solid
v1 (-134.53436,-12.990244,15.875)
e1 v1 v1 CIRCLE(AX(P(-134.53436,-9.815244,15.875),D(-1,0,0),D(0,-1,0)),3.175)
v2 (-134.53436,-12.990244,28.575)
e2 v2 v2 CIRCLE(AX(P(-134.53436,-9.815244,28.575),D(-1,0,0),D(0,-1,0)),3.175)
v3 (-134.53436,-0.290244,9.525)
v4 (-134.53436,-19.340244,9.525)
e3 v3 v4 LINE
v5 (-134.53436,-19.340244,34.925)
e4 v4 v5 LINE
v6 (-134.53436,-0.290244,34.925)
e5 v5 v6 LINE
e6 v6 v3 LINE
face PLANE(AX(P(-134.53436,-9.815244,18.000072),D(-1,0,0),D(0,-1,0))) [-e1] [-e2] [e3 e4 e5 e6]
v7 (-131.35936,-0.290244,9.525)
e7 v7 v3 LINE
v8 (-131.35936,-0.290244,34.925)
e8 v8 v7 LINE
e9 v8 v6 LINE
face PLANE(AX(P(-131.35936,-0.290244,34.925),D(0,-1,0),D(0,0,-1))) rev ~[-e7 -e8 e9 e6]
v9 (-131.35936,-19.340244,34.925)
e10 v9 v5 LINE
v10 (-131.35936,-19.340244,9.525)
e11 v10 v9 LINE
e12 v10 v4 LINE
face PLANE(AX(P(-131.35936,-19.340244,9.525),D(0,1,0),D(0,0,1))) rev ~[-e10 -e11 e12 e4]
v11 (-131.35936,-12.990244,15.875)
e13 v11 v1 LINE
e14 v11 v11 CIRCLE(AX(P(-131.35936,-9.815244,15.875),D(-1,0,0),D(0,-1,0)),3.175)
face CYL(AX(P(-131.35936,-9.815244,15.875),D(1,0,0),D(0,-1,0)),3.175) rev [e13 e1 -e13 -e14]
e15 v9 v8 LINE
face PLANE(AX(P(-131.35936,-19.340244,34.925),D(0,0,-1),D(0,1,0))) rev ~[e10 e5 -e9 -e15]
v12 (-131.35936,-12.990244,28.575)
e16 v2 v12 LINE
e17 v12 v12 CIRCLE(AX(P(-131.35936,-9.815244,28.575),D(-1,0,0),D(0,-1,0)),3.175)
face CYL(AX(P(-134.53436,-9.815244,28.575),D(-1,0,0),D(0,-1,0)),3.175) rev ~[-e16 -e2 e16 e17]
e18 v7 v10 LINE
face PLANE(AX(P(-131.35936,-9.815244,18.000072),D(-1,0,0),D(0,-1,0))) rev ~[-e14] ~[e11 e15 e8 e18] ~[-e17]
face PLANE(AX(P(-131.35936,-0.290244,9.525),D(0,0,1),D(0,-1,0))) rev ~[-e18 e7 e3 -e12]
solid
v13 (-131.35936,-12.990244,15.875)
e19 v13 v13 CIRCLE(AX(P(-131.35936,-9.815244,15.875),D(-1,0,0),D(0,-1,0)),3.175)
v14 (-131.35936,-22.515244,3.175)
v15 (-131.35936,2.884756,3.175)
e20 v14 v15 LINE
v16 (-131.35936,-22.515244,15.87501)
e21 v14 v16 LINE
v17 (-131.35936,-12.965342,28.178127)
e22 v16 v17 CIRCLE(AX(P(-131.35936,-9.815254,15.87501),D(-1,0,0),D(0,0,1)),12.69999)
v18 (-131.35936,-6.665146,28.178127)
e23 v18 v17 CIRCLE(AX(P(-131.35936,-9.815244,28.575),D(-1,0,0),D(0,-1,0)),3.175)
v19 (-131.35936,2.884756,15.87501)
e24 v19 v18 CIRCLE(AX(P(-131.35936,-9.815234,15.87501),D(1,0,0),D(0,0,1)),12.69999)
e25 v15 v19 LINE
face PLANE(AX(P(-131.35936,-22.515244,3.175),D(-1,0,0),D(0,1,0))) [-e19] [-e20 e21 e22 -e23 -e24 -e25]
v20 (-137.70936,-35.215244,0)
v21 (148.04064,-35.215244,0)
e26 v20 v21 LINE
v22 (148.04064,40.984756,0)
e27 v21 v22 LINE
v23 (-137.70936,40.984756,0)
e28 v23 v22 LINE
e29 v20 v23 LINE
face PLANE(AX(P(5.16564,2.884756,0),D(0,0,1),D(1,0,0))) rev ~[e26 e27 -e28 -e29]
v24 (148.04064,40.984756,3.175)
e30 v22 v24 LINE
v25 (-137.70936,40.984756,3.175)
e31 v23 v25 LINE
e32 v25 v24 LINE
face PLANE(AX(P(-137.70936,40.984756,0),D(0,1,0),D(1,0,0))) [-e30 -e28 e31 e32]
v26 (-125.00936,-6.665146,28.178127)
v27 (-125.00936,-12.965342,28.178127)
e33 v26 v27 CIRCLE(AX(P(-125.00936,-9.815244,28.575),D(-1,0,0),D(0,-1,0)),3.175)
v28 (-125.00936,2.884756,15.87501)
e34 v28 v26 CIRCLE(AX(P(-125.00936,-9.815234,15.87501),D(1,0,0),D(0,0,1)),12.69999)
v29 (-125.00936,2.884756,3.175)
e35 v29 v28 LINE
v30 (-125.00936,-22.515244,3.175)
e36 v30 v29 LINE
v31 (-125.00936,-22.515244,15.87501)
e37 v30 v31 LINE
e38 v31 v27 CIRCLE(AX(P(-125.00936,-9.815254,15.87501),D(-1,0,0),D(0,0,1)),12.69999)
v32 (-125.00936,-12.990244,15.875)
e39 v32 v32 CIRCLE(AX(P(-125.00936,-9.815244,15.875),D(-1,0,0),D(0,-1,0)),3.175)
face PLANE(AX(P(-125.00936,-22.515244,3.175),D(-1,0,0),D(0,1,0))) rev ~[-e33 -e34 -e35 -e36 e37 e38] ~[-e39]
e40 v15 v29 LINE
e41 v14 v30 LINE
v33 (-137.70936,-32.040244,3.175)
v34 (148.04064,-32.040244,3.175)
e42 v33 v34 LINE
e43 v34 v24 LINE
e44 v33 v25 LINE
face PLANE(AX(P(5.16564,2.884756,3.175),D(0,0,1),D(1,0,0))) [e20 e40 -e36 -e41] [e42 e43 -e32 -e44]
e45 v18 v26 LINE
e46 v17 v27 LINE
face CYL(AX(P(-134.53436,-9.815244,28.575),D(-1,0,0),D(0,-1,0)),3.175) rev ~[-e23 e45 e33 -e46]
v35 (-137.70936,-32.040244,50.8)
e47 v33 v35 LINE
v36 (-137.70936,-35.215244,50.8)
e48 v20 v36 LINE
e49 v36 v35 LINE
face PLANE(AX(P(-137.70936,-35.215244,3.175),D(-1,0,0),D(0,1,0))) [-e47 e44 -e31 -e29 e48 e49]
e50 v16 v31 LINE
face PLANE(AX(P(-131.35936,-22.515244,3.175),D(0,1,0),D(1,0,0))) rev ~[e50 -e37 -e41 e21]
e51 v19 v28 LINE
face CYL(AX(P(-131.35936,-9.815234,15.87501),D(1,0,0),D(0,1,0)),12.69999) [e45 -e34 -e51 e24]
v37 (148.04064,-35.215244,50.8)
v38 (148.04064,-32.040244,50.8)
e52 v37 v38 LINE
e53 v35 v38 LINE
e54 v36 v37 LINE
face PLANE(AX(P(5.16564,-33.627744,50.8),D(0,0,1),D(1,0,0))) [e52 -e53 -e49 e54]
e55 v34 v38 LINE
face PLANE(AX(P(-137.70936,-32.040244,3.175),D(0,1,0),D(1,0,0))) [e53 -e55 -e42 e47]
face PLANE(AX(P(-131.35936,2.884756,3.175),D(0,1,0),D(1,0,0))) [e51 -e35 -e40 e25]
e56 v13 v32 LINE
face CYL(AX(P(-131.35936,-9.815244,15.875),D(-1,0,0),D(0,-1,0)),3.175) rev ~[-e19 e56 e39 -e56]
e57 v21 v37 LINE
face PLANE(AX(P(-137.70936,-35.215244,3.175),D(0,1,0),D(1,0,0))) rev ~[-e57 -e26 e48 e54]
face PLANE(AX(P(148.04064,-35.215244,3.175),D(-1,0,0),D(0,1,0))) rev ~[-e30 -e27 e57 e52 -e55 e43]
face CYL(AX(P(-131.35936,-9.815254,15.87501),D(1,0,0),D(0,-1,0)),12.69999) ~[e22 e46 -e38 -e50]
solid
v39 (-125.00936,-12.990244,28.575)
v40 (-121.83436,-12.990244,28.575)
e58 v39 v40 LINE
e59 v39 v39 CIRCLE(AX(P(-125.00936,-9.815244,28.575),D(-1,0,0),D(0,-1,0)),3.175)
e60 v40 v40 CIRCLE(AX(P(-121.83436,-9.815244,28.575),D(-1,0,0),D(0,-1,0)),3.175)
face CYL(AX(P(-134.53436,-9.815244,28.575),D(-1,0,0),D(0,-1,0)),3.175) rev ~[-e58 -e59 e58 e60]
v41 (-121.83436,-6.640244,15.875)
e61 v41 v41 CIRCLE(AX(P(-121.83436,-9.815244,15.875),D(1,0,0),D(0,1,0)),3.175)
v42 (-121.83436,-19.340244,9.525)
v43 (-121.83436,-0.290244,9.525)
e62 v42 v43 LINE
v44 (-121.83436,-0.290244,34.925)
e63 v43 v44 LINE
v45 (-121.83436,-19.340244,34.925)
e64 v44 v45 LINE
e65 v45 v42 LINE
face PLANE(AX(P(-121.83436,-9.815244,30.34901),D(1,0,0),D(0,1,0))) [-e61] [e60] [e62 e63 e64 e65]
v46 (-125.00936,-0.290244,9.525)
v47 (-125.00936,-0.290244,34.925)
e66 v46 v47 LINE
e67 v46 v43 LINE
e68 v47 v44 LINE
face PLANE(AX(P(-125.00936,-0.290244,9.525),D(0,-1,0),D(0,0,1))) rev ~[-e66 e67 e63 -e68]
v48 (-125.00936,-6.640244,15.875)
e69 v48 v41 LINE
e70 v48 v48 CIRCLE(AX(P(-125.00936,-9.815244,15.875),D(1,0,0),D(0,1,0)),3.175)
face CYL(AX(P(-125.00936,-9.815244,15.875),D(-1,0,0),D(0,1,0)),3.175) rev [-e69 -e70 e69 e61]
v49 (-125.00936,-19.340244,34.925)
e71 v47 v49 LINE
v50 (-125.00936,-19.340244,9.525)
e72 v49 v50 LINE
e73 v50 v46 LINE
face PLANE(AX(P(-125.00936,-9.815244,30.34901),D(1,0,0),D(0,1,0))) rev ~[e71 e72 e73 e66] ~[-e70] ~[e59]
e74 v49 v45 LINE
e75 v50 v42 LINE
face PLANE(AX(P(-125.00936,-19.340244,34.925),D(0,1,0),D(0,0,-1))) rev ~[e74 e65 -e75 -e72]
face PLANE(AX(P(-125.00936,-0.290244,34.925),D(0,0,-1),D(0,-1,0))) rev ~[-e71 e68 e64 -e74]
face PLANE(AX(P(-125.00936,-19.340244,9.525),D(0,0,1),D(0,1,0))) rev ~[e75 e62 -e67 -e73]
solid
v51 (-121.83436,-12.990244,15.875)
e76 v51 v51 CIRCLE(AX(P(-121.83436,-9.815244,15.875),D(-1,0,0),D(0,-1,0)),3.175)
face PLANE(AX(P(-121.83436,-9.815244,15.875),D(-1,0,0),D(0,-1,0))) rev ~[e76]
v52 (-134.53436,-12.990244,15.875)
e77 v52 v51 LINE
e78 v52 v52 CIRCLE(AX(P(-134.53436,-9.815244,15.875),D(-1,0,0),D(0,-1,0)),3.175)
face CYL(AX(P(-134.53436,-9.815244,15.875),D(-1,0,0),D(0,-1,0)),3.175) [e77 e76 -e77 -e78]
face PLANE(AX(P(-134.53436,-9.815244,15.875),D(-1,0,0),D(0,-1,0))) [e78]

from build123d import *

# Parameters (mm, degrees)
F0_W      = 285.75
F0_H      = 76.2
F1_DEPTH  = 3.175
F2_W      = 285.75
F2_H      = 3.175
F3_DEPTH  = 47.625
F4_W      = 6.35
F4_H      = 25.4
F5_DEPTH  = 25.4
F6_R      = 12.69999
F7_R      = 3.175
F8_DEPTH  = 6.35
F9_R      = 3.175
F10_DEPTH = 3.175
F11_R     = 3.175
F12_DEPTH = 3.175
F13_R     = 3.175
F14_DEPTH = 25.4
F15_R     = 3.175
F16_DEPTH = 25.4
F17_R     = 3.175
F18_DEPTH = 12.7
F20_DEPTH = 6.35


# Not quite as in the source:
# - a fillet or chamfer is up to 0.001 mm smaller than in the source, because OpenCascade refuses the exact size
# - ends of sketch curves that miss each other by under 0.0002 mm in the source are joined


with BuildPart() as f1:
    # F0 (on Top) → F1 (new body)
    with BuildSketch(Plane.XY):
        with Locations((5.1656402647, 2.8847559522)):
            Rectangle(F0_W, F0_H)
    extrude(amount=F1_DEPTH)

    # F2 (on face) → F3 (join)
    with BuildSketch(Plane.XY.offset(3.175)):
        with Locations((5.1656402647, -33.6277440478)):
            Rectangle(F2_W, F2_H)
    extrude(amount=F3_DEPTH)

    # F4 (on face) → F5 (join)
    with BuildSketch(Plane.XY.offset(3.175)):
        with Locations((-128.1843597353, -9.8152440478)):
            Rectangle(F4_W, F4_H)
    extrude(amount=F5_DEPTH)

    # F6 (radius 12.7 in the source; OpenCascade refuses exactly that, so slightly less here)
    f6_edges = [f1.edges().sort_by_distance(p)[0] for p in [
        (-128.18436, 2.884756, 28.575),
        (-128.18436, -22.515244, 28.575),
    ]]
    fillet(f6_edges, radius=F6_R)

    # F7 (on face) → F8 (cut)
    with BuildSketch(Plane(origin=(-131.3593597353, 0, 0), x_dir=(0, -1, 0), z_dir=(-1, 0, 0))):
        with Locations((9.8152440478, 15.875)):
            Circle(F7_R)
    extrude(amount=-F8_DEPTH, mode=Mode.SUBTRACT)


with BuildPart() as f10:
    # F9 (on face) → F10 (new body)
    with BuildSketch(Plane.YZ.offset(-125.0093597353)):
        with BuildLine():
            Line((-19.3402440478, 34.925), (-19.3402440478, 24.275266633))
            ThreePointArc((-19.3402440478, 24.275266633), (-15.0405086236, 27.4502620758), (-9.8152540478, 28.575))
            ThreePointArc((-9.8152540478, 28.575), (-4.589979472, 27.4502620758), (-0.2902440478, 24.275266633))
            Line((-0.2902440478, 24.275266633), (-0.2902440478, 34.925))
            Line((-0.2902440478, 34.925), (-19.3402440478, 34.925))
        make_face()
        with BuildLine():
            Line((-19.3402440478, 24.275266633), (-19.3402440478, 9.525))
            Line((-19.3402440478, 9.525), (-0.2902440478, 9.525))
            Line((-0.2902440478, 9.525), (-0.2902440478, 24.275266633))
            ThreePointArc((-0.2902440478, 24.275266633), (-4.589979472, 27.4502620758), (-9.8152340478, 28.575))
            ThreePointArc((-9.8152340478, 28.575), (-15.0405086236, 27.4502620758), (-19.3402440478, 24.275266633))
        make_face()
        with Locations((-9.8152440478, 15.875)):
            Circle(F9_R, mode=Mode.SUBTRACT)
    extrude(amount=F10_DEPTH)


with BuildPart() as f12:
    # F11 (on face) → F12 (new body)
    with BuildSketch(Plane(origin=(-131.3593597353, 0, 0), x_dir=(0, -1, 0), z_dir=(-1, 0, 0))):
        with BuildLine():
            ThreePointArc((9.8152340478, 28.575), (4.589979472, 27.4502620758), (0.2902440478, 24.275266633))
            Line((0.2902440478, 24.275266633), (0.2902440478, 9.525))
            Line((0.2902440478, 9.525), (19.3402440478, 9.525))
            Line((19.3402440478, 9.525), (19.3402440478, 24.275266633))
            ThreePointArc((19.3402440478, 24.275266633), (15.0405086236, 27.4502620758), (9.8152340478, 28.575))
        make_face()
        with Locations((9.8152440478, 15.875)):
            Circle(F11_R, mode=Mode.SUBTRACT)
        with BuildLine():
            Line((19.3402440478, 34.925), (0.2902440478, 34.925))
            Line((0.2902440478, 34.925), (0.2902440478, 24.275266633))
            ThreePointArc((0.2902440478, 24.275266633), (4.589979472, 27.4502620758), (9.8152340478, 28.575))
            ThreePointArc((9.8152340478, 28.575), (15.0405086236, 27.4502620758), (19.3402440478, 24.275266633))
            Line((19.3402440478, 24.275266633), (19.3402440478, 34.925))
        make_face()
    extrude(amount=F12_DEPTH)


with BuildPart() as f14_tool:
    # F13 (on face) → F14 (new body)
    with BuildSketch(Plane(origin=(-134.5343597353, 0, 0), x_dir=(0, -1, 0), z_dir=(-1, 0, 0))):
        with Locations((9.8152440478, 28.575)):
            Circle(F13_R)
    extrude(amount=-F14_DEPTH)


with BuildPart() as f1_1:
    add(f1.part)

    # F14: cut by f14_tool
    add(f14_tool.part, mode=Mode.SUBTRACT)

    # F15 (on face) → F16 (cut)
    with BuildSketch(Plane.YZ.offset(-121.8343597353)):
        with Locations((-9.8152440478, 28.575)):
            Circle(F15_R)
    extrude(amount=-F16_DEPTH, mode=Mode.SUBTRACT)

    # F19 (on face) → F20 (cut)
    with BuildSketch(Plane(origin=(-131.3593597353, 0, 0), x_dir=(0, -1, 0), z_dir=(-1, 0, 0))):
        with BuildLine():
            ThreePointArc((12.9653419757, 28.1781271679), (12.9840124143, 28.376173343), (12.9902440478, 28.575))
            ThreePointArc((12.9902440478, 28.575), (9.6164173909, 31.7437683665), (6.66514612, 28.1781271679))
            ThreePointArc((6.66514612, 28.1781271679), (9.8152440478, 25.4), (12.9653419757, 28.1781271679))
        make_face()
    extrude(amount=-F20_DEPTH, mode=Mode.SUBTRACT)


with BuildPart() as f10_1:
    add(f10.part)

    # F14: cut by f14_tool
    add(f14_tool.part, mode=Mode.SUBTRACT)


with BuildPart() as f12_1:
    add(f12.part)

    # F14: cut by f14_tool
    add(f14_tool.part, mode=Mode.SUBTRACT)


with BuildPart() as f18:
    # F17 (on face) → F18 (new body)
    with BuildSketch(Plane(origin=(-134.5343597353, 0, 0), x_dir=(0, -1, 0), z_dir=(-1, 0, 0))):
        with Locations((9.8152440478, 15.875)):
            Circle(F17_R)
    extrude(amount=-F18_DEPTH)


solid = Compound([f1_1.part, f10_1.part, f12_1.part, f18.part])
